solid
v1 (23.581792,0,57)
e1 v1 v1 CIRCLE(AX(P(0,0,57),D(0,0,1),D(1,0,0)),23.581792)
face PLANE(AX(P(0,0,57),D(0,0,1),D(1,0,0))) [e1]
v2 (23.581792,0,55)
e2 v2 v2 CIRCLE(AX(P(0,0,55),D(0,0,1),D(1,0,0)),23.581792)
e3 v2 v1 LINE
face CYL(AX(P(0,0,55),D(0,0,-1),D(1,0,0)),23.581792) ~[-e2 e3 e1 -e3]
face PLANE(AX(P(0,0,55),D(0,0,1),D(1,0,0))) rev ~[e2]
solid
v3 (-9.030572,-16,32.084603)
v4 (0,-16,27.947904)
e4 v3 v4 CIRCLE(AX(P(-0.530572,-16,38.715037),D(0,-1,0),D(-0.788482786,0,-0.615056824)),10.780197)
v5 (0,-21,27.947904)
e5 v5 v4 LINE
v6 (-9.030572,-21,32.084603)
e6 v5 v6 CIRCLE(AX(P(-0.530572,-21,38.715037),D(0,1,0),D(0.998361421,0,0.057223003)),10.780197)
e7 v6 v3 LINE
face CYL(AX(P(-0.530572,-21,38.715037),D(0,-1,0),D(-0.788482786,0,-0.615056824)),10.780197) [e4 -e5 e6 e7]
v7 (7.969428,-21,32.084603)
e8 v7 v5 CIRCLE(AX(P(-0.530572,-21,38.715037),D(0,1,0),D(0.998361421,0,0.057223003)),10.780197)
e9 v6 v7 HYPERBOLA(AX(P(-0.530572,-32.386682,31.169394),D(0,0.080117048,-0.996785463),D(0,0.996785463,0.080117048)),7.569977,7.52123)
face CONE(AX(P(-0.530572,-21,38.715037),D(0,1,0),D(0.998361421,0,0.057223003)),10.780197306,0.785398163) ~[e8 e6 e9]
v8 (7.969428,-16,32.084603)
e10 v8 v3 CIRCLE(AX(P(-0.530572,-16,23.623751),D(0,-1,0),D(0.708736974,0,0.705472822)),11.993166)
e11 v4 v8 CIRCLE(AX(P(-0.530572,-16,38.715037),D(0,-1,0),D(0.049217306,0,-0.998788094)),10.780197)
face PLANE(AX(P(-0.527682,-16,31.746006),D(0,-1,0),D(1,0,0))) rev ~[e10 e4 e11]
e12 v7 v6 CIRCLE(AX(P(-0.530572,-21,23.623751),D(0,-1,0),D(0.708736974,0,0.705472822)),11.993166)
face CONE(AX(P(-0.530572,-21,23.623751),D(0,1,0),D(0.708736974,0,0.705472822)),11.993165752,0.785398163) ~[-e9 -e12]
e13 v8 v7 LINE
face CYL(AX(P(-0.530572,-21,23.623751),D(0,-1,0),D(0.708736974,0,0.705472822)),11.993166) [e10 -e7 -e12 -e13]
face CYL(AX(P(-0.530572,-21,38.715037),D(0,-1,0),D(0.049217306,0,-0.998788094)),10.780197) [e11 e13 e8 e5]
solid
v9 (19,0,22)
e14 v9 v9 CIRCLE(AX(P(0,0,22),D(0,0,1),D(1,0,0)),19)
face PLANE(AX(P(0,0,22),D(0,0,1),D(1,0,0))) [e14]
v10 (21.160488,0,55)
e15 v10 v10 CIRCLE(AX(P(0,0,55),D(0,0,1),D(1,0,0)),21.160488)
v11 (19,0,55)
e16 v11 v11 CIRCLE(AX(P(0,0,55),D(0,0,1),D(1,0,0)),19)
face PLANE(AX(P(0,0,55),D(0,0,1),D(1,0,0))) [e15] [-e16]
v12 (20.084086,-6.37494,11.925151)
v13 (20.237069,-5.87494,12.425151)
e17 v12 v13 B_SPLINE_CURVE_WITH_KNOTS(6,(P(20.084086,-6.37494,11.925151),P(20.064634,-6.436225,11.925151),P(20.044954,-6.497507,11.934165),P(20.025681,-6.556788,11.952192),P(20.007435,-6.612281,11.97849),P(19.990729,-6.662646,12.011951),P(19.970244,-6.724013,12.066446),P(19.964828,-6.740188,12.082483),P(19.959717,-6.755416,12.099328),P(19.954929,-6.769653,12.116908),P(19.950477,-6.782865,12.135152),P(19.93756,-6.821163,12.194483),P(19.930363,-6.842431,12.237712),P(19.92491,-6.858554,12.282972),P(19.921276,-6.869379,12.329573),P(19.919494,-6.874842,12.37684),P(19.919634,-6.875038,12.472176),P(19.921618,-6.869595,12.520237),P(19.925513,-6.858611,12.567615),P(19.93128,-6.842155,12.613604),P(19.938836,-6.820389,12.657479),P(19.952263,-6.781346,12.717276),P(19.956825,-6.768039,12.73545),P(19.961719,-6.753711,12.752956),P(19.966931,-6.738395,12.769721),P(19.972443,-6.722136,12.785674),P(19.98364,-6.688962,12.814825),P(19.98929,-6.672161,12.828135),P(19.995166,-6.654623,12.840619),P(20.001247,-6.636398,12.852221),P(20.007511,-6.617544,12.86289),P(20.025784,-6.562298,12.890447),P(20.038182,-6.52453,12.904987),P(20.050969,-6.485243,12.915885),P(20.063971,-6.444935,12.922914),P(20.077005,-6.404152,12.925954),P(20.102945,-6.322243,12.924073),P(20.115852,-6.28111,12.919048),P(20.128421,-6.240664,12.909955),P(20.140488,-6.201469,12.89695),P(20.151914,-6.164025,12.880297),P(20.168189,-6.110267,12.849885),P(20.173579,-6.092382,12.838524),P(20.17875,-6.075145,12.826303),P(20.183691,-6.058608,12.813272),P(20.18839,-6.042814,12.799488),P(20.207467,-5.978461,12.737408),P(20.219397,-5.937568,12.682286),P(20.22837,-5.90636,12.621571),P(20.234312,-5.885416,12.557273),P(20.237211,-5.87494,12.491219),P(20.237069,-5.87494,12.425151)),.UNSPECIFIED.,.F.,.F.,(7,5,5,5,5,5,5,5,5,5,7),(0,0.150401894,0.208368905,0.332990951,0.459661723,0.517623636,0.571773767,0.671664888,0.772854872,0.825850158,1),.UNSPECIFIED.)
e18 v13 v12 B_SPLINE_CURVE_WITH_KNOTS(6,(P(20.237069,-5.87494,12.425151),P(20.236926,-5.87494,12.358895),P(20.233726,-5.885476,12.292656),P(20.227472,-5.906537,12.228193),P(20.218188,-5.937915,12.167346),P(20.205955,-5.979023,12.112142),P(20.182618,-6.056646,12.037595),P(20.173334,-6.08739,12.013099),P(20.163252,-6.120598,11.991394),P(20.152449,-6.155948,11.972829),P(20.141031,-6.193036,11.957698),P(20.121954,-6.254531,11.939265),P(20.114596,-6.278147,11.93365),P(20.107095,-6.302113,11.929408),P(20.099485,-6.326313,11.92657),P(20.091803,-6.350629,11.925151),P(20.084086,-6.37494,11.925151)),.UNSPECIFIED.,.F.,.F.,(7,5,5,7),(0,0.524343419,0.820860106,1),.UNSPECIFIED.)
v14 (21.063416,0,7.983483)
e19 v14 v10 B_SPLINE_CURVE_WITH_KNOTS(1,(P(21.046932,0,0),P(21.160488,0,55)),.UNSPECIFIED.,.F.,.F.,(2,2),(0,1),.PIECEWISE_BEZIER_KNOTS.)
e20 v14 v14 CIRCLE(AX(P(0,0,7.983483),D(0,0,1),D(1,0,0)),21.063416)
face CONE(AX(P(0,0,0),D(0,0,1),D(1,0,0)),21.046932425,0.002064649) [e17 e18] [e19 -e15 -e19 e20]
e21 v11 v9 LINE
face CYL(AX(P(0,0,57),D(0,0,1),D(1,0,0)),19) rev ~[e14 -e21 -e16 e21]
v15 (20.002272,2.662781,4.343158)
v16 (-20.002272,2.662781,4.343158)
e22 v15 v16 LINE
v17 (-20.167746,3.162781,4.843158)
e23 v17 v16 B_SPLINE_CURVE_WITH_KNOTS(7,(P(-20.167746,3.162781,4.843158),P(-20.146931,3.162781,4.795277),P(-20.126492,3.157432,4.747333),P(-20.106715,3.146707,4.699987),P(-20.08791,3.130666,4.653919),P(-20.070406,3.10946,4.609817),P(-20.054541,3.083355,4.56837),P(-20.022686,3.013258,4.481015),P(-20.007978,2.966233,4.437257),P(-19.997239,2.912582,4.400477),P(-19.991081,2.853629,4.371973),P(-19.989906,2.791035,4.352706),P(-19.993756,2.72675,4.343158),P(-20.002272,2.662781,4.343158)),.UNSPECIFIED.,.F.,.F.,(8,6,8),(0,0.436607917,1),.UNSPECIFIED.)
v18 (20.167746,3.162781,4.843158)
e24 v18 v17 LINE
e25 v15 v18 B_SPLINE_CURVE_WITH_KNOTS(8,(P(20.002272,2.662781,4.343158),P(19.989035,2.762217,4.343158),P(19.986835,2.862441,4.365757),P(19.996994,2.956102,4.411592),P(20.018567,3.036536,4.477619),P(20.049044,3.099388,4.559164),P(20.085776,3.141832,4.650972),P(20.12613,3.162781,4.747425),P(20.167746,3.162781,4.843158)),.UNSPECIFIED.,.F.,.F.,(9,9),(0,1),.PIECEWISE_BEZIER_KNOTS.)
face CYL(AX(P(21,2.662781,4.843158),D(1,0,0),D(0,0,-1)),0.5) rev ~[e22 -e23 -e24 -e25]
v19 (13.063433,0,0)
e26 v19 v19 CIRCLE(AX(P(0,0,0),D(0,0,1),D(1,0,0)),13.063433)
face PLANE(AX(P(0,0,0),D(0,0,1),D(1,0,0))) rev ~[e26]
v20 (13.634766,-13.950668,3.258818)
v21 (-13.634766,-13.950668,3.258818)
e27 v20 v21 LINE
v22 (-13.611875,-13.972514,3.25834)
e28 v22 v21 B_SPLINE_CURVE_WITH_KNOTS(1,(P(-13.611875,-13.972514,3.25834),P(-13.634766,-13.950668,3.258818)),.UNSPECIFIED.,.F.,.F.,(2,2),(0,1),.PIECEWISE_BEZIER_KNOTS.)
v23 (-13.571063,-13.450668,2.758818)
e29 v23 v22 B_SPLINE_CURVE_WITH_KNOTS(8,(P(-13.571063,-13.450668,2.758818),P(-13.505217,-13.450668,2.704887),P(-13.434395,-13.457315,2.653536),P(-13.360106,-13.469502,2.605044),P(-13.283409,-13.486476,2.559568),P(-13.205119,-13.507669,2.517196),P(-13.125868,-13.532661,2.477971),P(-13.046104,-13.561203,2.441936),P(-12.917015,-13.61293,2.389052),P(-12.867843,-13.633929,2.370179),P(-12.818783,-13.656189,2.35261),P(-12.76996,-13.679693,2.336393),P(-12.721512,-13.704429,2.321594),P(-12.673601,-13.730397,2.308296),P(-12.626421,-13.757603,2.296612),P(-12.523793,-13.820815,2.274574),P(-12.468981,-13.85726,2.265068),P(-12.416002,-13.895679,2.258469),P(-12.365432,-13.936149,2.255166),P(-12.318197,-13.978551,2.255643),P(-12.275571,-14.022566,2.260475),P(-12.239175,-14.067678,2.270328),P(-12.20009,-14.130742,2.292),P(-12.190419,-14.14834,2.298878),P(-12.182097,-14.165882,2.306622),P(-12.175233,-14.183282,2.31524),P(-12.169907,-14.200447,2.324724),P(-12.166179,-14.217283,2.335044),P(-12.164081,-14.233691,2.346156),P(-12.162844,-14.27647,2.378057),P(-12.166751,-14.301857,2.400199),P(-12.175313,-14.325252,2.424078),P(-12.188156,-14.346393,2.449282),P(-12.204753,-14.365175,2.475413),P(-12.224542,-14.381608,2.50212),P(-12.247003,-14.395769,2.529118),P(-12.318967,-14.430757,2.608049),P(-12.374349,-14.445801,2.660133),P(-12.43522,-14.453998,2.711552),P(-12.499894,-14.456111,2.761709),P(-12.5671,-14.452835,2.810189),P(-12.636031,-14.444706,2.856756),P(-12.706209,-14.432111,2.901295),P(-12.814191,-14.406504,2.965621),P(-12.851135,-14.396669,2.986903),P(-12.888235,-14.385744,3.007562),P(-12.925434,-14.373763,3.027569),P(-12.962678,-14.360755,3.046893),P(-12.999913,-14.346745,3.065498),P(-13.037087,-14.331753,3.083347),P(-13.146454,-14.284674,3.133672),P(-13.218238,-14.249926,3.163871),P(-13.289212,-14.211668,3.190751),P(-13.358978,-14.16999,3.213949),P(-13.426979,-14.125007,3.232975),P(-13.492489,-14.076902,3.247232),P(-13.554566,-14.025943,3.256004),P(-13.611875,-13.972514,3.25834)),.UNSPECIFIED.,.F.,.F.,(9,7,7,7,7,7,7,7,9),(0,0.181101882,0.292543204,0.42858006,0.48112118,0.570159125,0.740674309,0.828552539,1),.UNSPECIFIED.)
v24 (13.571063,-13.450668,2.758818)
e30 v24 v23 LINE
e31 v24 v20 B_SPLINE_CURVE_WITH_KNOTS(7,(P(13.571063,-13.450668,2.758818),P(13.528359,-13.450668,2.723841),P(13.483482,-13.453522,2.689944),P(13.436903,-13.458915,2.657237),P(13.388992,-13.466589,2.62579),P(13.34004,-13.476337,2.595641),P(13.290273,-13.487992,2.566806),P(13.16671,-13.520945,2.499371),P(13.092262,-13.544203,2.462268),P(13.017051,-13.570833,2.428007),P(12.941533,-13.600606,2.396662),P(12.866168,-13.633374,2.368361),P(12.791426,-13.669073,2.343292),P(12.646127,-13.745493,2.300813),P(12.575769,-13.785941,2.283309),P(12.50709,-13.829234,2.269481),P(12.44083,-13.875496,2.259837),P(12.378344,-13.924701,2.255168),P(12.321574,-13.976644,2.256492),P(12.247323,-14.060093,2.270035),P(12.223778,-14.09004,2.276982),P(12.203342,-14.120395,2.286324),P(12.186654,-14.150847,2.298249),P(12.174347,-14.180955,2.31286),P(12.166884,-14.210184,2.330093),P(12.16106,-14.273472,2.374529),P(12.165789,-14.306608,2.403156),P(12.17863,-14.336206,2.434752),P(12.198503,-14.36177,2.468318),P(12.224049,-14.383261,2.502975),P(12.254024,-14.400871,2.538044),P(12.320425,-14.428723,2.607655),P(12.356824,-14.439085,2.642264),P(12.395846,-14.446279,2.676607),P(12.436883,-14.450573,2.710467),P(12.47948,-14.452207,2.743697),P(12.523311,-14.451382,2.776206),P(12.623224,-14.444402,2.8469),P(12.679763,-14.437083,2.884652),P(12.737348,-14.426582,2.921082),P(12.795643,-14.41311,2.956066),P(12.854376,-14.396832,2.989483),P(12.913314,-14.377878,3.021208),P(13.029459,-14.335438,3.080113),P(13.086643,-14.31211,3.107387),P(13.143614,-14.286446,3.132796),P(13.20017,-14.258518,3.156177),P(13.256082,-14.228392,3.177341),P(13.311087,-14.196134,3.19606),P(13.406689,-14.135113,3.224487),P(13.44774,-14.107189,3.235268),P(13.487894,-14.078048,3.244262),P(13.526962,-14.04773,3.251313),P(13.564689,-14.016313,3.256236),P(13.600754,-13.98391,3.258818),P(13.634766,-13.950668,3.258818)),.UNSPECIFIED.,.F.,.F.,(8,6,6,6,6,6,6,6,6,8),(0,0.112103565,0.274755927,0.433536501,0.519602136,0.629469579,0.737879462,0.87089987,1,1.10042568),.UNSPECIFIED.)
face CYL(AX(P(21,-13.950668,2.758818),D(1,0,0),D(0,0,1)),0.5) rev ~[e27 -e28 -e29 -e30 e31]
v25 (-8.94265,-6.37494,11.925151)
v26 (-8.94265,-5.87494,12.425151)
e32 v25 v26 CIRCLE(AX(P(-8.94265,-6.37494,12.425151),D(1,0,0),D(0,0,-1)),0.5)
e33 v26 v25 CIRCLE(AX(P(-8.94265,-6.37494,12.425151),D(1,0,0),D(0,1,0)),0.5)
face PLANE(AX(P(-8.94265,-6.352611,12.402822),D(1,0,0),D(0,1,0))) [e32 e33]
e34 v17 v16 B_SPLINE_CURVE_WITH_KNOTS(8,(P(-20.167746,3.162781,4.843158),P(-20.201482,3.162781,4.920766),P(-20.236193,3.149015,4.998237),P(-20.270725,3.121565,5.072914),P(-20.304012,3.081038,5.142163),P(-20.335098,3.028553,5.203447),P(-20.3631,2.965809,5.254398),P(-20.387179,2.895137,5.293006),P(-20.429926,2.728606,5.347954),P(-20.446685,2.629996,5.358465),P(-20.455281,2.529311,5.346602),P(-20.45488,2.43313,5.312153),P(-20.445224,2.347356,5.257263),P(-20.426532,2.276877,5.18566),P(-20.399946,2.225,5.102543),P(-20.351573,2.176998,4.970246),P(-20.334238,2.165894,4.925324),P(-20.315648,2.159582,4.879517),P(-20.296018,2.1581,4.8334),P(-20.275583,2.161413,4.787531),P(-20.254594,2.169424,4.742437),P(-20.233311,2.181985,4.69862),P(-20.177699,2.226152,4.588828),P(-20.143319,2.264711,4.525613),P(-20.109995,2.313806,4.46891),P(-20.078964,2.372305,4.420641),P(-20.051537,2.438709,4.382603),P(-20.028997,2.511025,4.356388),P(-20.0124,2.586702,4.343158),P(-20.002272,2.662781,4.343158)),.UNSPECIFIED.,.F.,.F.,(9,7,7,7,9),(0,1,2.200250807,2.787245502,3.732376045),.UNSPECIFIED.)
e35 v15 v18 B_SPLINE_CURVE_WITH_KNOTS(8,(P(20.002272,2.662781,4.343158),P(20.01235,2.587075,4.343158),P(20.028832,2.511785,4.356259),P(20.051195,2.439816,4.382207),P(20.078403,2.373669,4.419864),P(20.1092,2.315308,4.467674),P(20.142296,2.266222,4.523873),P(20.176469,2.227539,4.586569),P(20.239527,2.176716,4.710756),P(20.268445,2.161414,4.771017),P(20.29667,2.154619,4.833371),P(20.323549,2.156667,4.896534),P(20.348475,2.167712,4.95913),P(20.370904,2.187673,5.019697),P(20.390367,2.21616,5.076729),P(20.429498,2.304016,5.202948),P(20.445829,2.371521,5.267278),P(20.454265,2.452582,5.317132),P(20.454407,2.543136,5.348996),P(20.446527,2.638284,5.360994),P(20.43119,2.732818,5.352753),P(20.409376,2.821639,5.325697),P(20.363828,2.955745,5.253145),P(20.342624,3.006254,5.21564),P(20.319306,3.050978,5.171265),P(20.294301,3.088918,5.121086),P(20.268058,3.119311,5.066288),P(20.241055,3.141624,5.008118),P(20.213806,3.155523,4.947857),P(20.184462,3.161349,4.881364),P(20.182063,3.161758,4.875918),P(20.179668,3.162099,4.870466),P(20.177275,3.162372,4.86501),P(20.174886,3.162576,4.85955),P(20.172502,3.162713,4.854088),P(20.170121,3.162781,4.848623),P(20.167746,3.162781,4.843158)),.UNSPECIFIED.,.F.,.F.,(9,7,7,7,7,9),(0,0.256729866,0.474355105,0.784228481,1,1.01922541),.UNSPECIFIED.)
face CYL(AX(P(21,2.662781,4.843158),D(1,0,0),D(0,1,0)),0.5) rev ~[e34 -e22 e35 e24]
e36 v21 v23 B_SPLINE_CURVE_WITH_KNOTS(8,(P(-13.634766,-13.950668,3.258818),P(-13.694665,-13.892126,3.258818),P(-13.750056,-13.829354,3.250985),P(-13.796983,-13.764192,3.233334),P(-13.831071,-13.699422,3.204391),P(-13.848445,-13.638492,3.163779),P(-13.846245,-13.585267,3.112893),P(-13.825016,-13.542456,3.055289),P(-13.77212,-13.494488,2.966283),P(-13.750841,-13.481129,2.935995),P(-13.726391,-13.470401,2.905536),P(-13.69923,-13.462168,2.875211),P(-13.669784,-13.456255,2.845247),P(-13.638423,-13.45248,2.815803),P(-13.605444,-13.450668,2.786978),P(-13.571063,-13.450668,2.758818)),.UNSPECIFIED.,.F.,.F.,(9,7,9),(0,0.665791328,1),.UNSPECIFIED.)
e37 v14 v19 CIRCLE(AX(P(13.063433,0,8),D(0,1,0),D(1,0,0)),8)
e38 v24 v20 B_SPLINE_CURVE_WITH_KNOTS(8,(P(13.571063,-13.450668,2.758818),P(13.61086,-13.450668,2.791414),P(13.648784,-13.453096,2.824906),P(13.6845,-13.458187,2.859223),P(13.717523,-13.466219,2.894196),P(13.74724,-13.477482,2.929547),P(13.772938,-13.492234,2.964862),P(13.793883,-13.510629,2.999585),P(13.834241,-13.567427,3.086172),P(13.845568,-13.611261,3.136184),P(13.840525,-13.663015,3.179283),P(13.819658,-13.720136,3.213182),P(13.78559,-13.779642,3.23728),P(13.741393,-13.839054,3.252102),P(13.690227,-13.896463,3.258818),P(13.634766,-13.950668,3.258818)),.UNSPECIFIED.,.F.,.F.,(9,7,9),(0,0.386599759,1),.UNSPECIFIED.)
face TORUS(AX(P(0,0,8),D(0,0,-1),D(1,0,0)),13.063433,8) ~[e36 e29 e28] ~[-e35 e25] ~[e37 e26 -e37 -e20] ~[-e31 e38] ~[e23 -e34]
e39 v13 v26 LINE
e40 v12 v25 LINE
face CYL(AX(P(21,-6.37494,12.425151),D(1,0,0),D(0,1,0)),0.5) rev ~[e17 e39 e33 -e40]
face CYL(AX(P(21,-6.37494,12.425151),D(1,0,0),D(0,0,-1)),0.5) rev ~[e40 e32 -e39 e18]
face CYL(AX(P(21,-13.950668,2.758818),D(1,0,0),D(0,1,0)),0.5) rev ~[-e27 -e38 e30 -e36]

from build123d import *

# Parameters (mm, degrees)
F1_R        = 21.0469324254
F2_R        = 21.1604882825
F4_R        = 8
F7_DEPTH    = 5
F8_SIZE2    = 5
F8_SIZE     = 5
F9_T2_ANGLE = 186.5608570094
F10_R       = 23.5817916237
F11_DEPTH   = 2
F13_R       = 19
F14_DEPTH   = 35
F17_DEPTH   = 58.0661
F19_DEPTH   = 70
F21_DEPTH   = 29.94265


# Not quite as in the source:
# - a fillet or chamfer that OpenCascade refuses, or shapes differently, is made with other operations: its cross-section is extruded or revolved along the edge and cut away or added


with BuildPart() as f3:
    # F1 (on Top) → F3 section 0
    with BuildSketch(Plane.XY):
        Circle(F1_R)
    # F2 (on offset) → F3 section 1
    with BuildSketch(Plane.XY.offset(55)):
        Circle(F2_R)
    loft()

    # F4
    f4_edges = [f3.edges().sort_by_distance(p)[0] for p in [
        (-21.046932, 0, 0),
    ]]
    fillet(f4_edges, radius=F4_R)

    # F13 (on offset) → F14 (cut)
    with BuildSketch(Plane.XY.offset(57)):
        Circle(F13_R)
    extrude(amount=-F14_DEPTH, mode=Mode.SUBTRACT)

    # F16 (on offset) → F17 (cut)
    with BuildSketch(Plane.YZ.offset(21)):
        with BuildLine():
            ThreePointArc((2.6627810146, 4.3431584433), (3.0163344052, 4.4896050527), (3.1627810146, 4.8431584433))
            ThreePointArc((3.1627810146, 4.8431584433), (2.309227624, 5.1967118339), (2.6627810146, 4.3431584433))
        make_face()
    extrude(amount=-F17_DEPTH, mode=Mode.SUBTRACT)

    # F18 (on offset) → F19 (cut)
    with BuildSketch(Plane.YZ.offset(21)):
        with BuildLine():
            ThreePointArc((-13.9506678134, 3.2588179801), (-14.304221204, 2.4052645895), (-13.4506678134, 2.7588179801))
            ThreePointArc((-13.4506678134, 2.7588179801), (-13.5971144228, 3.1123713707), (-13.9506678134, 3.2588179801))
        make_face()
    extrude(amount=-F19_DEPTH, mode=Mode.SUBTRACT)

    # F20 (on offset) → F21 (cut)
    with BuildSketch(Plane.YZ.offset(21)):
        with BuildLine():
            ThreePointArc((-6.3749403842, 11.9251514375), (-6.0213869936, 12.0715980469), (-5.8749403842, 12.4251514375))
            ThreePointArc((-5.8749403842, 12.4251514375), (-6.7284937748, 12.7787048281), (-6.3749403842, 11.9251514375))
        make_face()
    extrude(amount=-F21_DEPTH, mode=Mode.SUBTRACT)


with BuildPart() as f7:
    # F6 (on offset) → F7 (new body, symmetric)
    with BuildSketch(Plane.XZ.offset(21)):
        with BuildLine():
            ThreePointArc((0, 27.9479043256), (4.435903154, 29.1470291114), (7.9694277323, 32.0846031273))
            ThreePointArc((7.9694277323, 32.0846031273), (-0.5305722677, 35.6169163952), (-9.0305722677, 32.0846031273))
            ThreePointArc((-9.0305722677, 32.0846031273), (-5.0201172156, 28.9141880975), (0, 27.9479043256))
        make_face()
    extrude(amount=F7_DEPTH, both=True)

    # F8
    f8_edges = [f7.edges().sort_by_distance(p)[0] for p in [
        (-0.530572, -26, 35.616916),
    ]]
    chamfer(f8_edges, length=F8_SIZE, length2=F8_SIZE2)

    # F9: chamfer of 5 on 1 edges, made by hand

    # F9_s1 → F9_t2 (revolve, cut)
    with BuildSketch(Plane(origin=(-2.2134979331, 0, 38.6185769281), x_dir=(0, 1, 0), z_dir=(-0.057223003, 0, 0.9983614215))):
        Polygon((-21, -12.4658851029), (-26, -7.4658851029), (-26, -12.4658851029), align=None)
    revolve(axis=Axis((-0.5305722677, -26, 38.7150370459), (0, 1, 0)), revolution_arc=F9_T2_ANGLE, mode=Mode.SUBTRACT)


with BuildPart() as f11:
    # F10 (on offset) → F11 (new body)
    with BuildSketch(Plane.XY.offset(55)):
        Circle(F10_R)
    extrude(amount=F11_DEPTH)


solid = Compound([f3.part, f7.part, f11.part])
